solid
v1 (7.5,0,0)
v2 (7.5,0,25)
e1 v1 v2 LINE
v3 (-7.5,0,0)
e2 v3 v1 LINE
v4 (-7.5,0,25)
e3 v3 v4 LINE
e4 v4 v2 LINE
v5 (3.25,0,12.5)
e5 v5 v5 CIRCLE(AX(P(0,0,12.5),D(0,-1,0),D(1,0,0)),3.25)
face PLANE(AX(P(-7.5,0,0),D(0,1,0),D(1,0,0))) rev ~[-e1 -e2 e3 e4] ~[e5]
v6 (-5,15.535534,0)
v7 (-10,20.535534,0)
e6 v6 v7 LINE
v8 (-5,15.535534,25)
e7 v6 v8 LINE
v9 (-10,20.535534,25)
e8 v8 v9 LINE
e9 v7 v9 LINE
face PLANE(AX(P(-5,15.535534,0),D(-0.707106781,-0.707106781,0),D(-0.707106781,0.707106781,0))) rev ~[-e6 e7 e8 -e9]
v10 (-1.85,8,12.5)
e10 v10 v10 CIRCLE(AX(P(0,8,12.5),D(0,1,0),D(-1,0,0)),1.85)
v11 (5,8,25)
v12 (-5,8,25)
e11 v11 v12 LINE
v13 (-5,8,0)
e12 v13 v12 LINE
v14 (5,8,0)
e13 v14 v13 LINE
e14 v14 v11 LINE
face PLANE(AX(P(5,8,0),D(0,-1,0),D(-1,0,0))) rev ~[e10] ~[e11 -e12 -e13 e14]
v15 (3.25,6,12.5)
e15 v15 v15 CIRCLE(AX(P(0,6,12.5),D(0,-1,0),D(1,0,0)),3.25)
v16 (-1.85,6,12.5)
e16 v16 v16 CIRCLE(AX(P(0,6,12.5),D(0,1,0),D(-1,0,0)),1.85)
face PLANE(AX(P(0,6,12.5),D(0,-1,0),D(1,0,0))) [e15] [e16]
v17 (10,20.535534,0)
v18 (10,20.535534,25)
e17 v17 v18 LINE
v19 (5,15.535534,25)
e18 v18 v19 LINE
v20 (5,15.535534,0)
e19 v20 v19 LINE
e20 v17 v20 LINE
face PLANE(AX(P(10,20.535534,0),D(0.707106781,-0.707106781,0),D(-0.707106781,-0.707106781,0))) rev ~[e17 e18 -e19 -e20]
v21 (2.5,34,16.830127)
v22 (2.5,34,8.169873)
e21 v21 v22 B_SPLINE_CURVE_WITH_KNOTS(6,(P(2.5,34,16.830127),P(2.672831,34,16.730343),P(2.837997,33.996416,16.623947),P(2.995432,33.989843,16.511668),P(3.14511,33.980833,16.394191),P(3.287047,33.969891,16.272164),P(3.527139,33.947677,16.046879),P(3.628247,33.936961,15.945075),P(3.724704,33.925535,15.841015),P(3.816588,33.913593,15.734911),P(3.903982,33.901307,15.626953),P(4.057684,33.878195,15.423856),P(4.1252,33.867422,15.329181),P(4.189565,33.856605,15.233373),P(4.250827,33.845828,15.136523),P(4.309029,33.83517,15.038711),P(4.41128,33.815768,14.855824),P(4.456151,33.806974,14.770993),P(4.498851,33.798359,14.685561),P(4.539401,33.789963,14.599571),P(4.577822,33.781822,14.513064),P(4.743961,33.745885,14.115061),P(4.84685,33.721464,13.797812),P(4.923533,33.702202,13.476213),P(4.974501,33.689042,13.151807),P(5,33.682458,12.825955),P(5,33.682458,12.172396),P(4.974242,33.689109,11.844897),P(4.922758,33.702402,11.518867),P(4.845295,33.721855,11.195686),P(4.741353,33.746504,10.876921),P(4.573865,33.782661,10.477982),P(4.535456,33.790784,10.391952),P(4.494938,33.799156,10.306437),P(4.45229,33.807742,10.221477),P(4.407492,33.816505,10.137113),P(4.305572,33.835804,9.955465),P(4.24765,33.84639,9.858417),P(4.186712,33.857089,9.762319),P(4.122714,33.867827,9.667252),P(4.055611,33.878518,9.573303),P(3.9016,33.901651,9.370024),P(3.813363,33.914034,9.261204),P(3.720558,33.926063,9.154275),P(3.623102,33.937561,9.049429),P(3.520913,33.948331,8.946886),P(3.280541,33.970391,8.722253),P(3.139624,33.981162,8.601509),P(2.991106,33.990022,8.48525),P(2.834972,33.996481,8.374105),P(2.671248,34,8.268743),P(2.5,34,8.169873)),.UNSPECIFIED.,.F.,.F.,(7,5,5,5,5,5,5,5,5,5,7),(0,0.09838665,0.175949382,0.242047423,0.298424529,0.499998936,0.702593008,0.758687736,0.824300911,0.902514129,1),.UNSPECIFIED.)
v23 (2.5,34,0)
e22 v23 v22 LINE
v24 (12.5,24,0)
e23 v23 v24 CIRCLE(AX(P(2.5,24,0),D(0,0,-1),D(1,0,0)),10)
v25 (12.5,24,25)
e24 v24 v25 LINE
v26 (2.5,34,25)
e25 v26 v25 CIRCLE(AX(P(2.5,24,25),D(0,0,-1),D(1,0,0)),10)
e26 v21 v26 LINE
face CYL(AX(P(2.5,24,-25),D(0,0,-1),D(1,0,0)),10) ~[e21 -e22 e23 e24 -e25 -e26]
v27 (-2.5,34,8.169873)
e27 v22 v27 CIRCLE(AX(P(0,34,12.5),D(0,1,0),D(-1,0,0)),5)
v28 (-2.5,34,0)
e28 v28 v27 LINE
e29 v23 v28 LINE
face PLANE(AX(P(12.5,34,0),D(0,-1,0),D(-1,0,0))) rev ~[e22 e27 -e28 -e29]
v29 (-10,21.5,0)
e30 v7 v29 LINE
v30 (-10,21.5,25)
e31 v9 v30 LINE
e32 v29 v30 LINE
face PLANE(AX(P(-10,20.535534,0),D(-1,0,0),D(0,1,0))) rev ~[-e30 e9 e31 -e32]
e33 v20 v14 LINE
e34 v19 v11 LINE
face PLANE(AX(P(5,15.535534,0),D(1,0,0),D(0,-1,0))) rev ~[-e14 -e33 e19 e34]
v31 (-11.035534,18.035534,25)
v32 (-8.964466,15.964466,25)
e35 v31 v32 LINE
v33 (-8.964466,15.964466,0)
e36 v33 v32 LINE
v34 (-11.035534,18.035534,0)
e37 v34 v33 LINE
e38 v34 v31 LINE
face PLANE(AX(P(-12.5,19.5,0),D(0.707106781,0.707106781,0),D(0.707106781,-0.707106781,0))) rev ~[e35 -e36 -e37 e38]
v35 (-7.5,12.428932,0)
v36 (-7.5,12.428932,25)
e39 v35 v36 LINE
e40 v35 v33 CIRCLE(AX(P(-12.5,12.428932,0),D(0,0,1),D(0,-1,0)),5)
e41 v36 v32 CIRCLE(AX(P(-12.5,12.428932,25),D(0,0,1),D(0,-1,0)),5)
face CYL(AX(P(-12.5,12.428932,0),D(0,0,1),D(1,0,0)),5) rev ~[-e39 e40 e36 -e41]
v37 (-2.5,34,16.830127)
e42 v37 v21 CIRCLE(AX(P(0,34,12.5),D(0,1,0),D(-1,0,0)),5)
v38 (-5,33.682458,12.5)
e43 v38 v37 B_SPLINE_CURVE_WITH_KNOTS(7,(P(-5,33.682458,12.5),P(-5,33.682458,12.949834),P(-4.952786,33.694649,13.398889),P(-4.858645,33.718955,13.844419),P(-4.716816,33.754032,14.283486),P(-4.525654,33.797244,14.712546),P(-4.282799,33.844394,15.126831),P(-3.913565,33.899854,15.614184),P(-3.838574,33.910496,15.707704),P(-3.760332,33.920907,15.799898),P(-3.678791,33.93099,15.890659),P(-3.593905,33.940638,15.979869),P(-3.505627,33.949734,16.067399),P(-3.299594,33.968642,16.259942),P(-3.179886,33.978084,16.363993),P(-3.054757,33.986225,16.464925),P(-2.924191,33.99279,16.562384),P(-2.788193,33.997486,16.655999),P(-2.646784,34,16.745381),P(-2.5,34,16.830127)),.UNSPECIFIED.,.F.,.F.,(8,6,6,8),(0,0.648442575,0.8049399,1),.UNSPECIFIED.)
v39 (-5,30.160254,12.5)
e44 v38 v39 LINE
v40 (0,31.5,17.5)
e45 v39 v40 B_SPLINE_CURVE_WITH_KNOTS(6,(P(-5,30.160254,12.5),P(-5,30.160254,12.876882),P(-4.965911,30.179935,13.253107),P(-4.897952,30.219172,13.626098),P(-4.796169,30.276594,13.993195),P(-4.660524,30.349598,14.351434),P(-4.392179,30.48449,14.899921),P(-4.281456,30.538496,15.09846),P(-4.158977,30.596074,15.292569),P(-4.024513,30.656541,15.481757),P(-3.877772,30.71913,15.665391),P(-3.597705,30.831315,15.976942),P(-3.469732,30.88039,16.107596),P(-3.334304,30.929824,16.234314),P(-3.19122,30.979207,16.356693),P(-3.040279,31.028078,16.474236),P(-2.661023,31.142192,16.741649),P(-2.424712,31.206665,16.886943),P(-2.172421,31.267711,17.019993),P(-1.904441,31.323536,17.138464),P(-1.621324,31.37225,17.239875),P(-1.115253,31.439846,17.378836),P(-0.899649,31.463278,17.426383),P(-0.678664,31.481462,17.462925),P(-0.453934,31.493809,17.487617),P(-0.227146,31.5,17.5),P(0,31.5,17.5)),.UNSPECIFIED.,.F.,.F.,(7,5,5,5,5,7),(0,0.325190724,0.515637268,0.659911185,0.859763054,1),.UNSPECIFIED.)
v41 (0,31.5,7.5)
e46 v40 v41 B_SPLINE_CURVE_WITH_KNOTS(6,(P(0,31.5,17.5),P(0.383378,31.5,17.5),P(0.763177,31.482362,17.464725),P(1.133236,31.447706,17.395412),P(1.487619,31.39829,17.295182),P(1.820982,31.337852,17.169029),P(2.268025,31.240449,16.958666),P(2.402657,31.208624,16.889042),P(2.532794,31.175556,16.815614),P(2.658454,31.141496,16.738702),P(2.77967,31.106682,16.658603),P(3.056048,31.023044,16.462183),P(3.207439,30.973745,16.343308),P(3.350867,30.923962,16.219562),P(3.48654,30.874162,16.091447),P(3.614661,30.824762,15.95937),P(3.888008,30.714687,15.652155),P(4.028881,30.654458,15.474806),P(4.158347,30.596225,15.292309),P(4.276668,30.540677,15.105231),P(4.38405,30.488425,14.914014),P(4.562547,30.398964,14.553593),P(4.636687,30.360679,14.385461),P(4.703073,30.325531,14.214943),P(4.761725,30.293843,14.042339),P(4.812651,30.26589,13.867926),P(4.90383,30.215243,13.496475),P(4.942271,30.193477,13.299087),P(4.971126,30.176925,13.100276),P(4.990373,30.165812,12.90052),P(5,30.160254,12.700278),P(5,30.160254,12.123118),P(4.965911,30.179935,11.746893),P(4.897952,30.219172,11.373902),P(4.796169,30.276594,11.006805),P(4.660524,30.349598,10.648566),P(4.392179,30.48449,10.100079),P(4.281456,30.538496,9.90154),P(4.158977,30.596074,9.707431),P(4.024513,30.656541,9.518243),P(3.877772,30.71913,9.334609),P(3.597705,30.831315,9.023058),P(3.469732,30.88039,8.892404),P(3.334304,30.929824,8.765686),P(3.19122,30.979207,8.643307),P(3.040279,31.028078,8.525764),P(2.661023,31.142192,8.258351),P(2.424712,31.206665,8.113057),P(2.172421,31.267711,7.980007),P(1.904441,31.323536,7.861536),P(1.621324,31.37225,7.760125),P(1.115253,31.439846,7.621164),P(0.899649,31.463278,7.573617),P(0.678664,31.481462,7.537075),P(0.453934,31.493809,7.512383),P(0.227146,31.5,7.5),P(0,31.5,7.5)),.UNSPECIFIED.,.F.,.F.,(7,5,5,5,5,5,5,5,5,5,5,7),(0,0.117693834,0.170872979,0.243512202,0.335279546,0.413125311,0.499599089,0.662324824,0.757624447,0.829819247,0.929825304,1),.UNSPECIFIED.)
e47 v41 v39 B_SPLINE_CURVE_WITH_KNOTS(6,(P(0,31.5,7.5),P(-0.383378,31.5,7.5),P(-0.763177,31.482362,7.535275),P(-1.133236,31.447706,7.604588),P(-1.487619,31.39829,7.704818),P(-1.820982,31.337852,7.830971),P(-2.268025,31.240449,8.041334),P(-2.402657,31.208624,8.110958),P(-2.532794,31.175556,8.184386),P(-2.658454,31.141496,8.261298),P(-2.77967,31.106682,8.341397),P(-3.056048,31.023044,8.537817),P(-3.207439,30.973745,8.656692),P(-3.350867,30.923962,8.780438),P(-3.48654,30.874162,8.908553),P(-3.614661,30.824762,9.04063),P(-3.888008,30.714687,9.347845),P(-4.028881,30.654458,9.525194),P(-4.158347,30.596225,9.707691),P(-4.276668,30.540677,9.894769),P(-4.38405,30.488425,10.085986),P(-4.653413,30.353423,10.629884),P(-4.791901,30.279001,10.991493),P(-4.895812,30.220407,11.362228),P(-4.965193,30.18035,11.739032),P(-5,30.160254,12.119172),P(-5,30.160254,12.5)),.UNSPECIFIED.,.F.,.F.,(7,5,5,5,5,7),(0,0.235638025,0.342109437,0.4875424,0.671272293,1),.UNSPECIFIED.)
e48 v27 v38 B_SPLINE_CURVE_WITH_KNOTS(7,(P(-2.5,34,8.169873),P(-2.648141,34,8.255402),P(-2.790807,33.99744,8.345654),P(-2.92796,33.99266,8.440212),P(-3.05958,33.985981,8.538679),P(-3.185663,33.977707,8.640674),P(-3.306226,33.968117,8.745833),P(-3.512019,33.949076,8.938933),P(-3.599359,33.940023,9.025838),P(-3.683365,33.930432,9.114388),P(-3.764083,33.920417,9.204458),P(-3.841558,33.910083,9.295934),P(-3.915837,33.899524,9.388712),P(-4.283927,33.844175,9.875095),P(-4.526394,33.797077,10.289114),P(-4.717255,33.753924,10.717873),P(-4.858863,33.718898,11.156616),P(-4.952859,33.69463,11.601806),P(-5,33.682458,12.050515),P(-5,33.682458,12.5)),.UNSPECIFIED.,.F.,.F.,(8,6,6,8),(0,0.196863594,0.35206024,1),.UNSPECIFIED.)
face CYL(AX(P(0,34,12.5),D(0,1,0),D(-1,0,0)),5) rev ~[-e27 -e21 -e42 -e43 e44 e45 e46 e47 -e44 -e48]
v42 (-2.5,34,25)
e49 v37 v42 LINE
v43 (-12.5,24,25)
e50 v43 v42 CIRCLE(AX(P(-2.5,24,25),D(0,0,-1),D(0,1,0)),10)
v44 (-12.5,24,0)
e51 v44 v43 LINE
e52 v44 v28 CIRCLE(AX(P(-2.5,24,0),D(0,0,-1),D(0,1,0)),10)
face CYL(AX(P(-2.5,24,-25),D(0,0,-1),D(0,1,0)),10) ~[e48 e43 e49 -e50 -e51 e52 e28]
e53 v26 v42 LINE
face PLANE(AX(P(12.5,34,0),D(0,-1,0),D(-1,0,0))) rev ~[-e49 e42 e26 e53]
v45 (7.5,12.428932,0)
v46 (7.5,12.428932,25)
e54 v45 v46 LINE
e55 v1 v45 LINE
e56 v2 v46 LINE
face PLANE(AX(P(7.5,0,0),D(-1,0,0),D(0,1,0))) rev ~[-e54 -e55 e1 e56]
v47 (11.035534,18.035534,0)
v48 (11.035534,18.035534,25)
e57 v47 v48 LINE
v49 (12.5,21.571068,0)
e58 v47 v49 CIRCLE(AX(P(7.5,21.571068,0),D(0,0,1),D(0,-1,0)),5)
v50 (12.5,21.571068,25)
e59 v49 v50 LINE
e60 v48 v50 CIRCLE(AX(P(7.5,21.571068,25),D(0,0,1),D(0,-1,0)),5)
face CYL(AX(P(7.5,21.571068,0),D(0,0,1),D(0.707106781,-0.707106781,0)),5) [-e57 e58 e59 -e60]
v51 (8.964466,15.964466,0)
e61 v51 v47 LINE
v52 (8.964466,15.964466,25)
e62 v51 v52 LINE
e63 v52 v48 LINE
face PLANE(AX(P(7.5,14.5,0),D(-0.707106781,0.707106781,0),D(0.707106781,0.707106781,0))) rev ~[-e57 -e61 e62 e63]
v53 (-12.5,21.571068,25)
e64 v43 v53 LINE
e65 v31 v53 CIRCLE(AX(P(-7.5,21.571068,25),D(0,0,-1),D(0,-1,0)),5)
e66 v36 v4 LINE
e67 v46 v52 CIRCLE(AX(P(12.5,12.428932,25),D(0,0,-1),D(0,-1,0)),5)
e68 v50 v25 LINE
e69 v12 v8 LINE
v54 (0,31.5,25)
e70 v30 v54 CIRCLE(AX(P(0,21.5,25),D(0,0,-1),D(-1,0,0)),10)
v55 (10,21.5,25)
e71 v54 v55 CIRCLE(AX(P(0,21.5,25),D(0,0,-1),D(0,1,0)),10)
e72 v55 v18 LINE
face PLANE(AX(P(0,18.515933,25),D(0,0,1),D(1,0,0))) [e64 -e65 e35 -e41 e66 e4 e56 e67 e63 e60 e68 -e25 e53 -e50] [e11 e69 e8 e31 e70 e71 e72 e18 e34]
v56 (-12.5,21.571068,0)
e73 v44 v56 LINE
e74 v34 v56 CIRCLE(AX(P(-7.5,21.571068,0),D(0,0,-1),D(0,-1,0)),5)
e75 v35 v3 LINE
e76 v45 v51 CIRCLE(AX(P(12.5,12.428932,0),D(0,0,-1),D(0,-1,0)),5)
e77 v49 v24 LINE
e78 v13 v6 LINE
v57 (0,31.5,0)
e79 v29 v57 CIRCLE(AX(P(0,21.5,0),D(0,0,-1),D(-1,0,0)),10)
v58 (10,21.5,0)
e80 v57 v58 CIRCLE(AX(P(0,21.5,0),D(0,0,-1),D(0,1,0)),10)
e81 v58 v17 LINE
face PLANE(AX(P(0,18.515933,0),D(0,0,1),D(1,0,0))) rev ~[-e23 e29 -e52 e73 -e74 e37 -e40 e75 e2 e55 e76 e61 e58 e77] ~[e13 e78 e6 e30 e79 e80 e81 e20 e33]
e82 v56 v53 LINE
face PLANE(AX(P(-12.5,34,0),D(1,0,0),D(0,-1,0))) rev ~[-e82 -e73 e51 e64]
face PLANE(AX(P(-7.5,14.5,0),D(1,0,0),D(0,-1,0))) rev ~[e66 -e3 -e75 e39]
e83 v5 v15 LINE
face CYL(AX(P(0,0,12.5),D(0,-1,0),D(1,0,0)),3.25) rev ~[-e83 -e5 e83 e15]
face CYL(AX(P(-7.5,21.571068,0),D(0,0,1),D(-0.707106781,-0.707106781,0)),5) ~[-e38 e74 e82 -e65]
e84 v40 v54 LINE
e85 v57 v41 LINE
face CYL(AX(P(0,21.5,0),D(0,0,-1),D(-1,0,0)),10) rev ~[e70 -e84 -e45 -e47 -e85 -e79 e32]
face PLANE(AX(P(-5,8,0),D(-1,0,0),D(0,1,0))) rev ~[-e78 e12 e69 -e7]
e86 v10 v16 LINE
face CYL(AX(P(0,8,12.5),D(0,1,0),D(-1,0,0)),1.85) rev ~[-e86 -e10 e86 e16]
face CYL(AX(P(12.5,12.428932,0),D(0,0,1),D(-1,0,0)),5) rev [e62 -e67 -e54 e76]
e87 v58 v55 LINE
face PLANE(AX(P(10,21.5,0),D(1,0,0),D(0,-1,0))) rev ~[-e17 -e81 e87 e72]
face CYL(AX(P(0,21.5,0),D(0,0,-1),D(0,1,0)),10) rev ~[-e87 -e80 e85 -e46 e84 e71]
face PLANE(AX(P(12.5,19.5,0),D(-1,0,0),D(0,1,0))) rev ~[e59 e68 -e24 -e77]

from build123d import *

# Parameters (mm, degrees)
F1_DEPTH    = 25
F2_R        = 5
F3_R        = 3.25
F4_DEPTH    = 6
F5_R        = 1.85
F6_DEPTH    = 2
F7_R        = 5
F8_DEPTH    = 8.9
F9_T1_DEPTH = 75


# Not quite as in the source:
# - a fillet or chamfer that OpenCascade refuses, or shapes differently, is made with other operations: its cross-section is extruded or revolved along the edge and cut away or added


with BuildPart() as f1:
    # F0 (on Top) → F1 (new body)
    with BuildSketch(Plane.XY):
        Polygon((-7.5, 0), (0, 0), (7.5, 0), (7.5, 14.5), (12.5, 19.5), (12.5, 34), (0, 34), (-12.5, 34), (-12.5, 19.5), (-7.5, 14.5), align=None)
        with BuildLine():
            Line((-10, 20.5355339059), (-10, 21.5))
            ThreePointArc((-10, 21.5), (-7.0710678119, 28.5710678119), (0, 31.5))
            ThreePointArc((0, 31.5), (7.0710678119, 28.5710678119), (10, 21.5))
            Line((10, 21.5), (10, 20.5355339059))
            Line((10, 20.5355339059), (5, 15.5355339059))
            Line((5, 15.5355339059), (5, 8))
            Line((5, 8), (-5, 8))
            Line((-5, 8), (-5, 15.5355339059))
            Line((-5, 15.5355339059), (-10, 20.5355339059))
        make_face(mode=Mode.SUBTRACT)
    extrude(amount=F1_DEPTH)

    # F2
    f2_edges = [f1.edges().sort_by_distance(p)[0] for p in [
        (-12.5, 19.5, 12.5),
        (-7.5, 14.5, 12.5),
        (12.5, 19.5, 12.5),
        (7.5, 14.5, 12.5),
    ]]
    fillet(f2_edges, radius=F2_R)

    # F3 (on face) → F4 (cut)
    with BuildSketch(Plane.XZ):
        with Locations((0, 12.5)):
            Circle(F3_R)
    extrude(amount=-F4_DEPTH, mode=Mode.SUBTRACT)

    # F5 (on face) → F6 (cut)
    with BuildSketch(Plane(origin=(0, 8, 0), x_dir=(-1, 0, 0), z_dir=(0, 1, 0))):
        with Locations((0, 12.5)):
            Circle(F5_R)
    extrude(amount=-F6_DEPTH, mode=Mode.SUBTRACT)

    # F7 (on face) → F8 (cut)
    with BuildSketch(Plane(origin=(0, 34, 0), x_dir=(-1, 0, 0), z_dir=(0, 1, 0))):
        with Locations((0, 12.5)):
            Circle(F7_R)
    extrude(amount=-F8_DEPTH, mode=Mode.SUBTRACT)

    # F9: fillet of radius 10 on 2 edges, made by hand

    # F9_s2 → F9_t1 (cut)
    with BuildSketch(Plane.XY.offset(-25)):
        with BuildLine():
            ThreePointArc((-2.5, 34), (-9.5710678119, 31.0710678119), (-12.5, 24))
            Line((-12.5, 24), (-12.5, 34))
            Line((-12.5, 34), (-2.5, 34))
        make_face()
        with BuildLine():
            ThreePointArc((12.5, 24), (9.5710678119, 31.0710678119), (2.5, 34))
            Line((2.5, 34), (12.5, 34))
            Line((12.5, 34), (12.5, 24))
        make_face()
    extrude(amount=F9_T1_DEPTH, mode=Mode.SUBTRACT)


solid = f1.part
